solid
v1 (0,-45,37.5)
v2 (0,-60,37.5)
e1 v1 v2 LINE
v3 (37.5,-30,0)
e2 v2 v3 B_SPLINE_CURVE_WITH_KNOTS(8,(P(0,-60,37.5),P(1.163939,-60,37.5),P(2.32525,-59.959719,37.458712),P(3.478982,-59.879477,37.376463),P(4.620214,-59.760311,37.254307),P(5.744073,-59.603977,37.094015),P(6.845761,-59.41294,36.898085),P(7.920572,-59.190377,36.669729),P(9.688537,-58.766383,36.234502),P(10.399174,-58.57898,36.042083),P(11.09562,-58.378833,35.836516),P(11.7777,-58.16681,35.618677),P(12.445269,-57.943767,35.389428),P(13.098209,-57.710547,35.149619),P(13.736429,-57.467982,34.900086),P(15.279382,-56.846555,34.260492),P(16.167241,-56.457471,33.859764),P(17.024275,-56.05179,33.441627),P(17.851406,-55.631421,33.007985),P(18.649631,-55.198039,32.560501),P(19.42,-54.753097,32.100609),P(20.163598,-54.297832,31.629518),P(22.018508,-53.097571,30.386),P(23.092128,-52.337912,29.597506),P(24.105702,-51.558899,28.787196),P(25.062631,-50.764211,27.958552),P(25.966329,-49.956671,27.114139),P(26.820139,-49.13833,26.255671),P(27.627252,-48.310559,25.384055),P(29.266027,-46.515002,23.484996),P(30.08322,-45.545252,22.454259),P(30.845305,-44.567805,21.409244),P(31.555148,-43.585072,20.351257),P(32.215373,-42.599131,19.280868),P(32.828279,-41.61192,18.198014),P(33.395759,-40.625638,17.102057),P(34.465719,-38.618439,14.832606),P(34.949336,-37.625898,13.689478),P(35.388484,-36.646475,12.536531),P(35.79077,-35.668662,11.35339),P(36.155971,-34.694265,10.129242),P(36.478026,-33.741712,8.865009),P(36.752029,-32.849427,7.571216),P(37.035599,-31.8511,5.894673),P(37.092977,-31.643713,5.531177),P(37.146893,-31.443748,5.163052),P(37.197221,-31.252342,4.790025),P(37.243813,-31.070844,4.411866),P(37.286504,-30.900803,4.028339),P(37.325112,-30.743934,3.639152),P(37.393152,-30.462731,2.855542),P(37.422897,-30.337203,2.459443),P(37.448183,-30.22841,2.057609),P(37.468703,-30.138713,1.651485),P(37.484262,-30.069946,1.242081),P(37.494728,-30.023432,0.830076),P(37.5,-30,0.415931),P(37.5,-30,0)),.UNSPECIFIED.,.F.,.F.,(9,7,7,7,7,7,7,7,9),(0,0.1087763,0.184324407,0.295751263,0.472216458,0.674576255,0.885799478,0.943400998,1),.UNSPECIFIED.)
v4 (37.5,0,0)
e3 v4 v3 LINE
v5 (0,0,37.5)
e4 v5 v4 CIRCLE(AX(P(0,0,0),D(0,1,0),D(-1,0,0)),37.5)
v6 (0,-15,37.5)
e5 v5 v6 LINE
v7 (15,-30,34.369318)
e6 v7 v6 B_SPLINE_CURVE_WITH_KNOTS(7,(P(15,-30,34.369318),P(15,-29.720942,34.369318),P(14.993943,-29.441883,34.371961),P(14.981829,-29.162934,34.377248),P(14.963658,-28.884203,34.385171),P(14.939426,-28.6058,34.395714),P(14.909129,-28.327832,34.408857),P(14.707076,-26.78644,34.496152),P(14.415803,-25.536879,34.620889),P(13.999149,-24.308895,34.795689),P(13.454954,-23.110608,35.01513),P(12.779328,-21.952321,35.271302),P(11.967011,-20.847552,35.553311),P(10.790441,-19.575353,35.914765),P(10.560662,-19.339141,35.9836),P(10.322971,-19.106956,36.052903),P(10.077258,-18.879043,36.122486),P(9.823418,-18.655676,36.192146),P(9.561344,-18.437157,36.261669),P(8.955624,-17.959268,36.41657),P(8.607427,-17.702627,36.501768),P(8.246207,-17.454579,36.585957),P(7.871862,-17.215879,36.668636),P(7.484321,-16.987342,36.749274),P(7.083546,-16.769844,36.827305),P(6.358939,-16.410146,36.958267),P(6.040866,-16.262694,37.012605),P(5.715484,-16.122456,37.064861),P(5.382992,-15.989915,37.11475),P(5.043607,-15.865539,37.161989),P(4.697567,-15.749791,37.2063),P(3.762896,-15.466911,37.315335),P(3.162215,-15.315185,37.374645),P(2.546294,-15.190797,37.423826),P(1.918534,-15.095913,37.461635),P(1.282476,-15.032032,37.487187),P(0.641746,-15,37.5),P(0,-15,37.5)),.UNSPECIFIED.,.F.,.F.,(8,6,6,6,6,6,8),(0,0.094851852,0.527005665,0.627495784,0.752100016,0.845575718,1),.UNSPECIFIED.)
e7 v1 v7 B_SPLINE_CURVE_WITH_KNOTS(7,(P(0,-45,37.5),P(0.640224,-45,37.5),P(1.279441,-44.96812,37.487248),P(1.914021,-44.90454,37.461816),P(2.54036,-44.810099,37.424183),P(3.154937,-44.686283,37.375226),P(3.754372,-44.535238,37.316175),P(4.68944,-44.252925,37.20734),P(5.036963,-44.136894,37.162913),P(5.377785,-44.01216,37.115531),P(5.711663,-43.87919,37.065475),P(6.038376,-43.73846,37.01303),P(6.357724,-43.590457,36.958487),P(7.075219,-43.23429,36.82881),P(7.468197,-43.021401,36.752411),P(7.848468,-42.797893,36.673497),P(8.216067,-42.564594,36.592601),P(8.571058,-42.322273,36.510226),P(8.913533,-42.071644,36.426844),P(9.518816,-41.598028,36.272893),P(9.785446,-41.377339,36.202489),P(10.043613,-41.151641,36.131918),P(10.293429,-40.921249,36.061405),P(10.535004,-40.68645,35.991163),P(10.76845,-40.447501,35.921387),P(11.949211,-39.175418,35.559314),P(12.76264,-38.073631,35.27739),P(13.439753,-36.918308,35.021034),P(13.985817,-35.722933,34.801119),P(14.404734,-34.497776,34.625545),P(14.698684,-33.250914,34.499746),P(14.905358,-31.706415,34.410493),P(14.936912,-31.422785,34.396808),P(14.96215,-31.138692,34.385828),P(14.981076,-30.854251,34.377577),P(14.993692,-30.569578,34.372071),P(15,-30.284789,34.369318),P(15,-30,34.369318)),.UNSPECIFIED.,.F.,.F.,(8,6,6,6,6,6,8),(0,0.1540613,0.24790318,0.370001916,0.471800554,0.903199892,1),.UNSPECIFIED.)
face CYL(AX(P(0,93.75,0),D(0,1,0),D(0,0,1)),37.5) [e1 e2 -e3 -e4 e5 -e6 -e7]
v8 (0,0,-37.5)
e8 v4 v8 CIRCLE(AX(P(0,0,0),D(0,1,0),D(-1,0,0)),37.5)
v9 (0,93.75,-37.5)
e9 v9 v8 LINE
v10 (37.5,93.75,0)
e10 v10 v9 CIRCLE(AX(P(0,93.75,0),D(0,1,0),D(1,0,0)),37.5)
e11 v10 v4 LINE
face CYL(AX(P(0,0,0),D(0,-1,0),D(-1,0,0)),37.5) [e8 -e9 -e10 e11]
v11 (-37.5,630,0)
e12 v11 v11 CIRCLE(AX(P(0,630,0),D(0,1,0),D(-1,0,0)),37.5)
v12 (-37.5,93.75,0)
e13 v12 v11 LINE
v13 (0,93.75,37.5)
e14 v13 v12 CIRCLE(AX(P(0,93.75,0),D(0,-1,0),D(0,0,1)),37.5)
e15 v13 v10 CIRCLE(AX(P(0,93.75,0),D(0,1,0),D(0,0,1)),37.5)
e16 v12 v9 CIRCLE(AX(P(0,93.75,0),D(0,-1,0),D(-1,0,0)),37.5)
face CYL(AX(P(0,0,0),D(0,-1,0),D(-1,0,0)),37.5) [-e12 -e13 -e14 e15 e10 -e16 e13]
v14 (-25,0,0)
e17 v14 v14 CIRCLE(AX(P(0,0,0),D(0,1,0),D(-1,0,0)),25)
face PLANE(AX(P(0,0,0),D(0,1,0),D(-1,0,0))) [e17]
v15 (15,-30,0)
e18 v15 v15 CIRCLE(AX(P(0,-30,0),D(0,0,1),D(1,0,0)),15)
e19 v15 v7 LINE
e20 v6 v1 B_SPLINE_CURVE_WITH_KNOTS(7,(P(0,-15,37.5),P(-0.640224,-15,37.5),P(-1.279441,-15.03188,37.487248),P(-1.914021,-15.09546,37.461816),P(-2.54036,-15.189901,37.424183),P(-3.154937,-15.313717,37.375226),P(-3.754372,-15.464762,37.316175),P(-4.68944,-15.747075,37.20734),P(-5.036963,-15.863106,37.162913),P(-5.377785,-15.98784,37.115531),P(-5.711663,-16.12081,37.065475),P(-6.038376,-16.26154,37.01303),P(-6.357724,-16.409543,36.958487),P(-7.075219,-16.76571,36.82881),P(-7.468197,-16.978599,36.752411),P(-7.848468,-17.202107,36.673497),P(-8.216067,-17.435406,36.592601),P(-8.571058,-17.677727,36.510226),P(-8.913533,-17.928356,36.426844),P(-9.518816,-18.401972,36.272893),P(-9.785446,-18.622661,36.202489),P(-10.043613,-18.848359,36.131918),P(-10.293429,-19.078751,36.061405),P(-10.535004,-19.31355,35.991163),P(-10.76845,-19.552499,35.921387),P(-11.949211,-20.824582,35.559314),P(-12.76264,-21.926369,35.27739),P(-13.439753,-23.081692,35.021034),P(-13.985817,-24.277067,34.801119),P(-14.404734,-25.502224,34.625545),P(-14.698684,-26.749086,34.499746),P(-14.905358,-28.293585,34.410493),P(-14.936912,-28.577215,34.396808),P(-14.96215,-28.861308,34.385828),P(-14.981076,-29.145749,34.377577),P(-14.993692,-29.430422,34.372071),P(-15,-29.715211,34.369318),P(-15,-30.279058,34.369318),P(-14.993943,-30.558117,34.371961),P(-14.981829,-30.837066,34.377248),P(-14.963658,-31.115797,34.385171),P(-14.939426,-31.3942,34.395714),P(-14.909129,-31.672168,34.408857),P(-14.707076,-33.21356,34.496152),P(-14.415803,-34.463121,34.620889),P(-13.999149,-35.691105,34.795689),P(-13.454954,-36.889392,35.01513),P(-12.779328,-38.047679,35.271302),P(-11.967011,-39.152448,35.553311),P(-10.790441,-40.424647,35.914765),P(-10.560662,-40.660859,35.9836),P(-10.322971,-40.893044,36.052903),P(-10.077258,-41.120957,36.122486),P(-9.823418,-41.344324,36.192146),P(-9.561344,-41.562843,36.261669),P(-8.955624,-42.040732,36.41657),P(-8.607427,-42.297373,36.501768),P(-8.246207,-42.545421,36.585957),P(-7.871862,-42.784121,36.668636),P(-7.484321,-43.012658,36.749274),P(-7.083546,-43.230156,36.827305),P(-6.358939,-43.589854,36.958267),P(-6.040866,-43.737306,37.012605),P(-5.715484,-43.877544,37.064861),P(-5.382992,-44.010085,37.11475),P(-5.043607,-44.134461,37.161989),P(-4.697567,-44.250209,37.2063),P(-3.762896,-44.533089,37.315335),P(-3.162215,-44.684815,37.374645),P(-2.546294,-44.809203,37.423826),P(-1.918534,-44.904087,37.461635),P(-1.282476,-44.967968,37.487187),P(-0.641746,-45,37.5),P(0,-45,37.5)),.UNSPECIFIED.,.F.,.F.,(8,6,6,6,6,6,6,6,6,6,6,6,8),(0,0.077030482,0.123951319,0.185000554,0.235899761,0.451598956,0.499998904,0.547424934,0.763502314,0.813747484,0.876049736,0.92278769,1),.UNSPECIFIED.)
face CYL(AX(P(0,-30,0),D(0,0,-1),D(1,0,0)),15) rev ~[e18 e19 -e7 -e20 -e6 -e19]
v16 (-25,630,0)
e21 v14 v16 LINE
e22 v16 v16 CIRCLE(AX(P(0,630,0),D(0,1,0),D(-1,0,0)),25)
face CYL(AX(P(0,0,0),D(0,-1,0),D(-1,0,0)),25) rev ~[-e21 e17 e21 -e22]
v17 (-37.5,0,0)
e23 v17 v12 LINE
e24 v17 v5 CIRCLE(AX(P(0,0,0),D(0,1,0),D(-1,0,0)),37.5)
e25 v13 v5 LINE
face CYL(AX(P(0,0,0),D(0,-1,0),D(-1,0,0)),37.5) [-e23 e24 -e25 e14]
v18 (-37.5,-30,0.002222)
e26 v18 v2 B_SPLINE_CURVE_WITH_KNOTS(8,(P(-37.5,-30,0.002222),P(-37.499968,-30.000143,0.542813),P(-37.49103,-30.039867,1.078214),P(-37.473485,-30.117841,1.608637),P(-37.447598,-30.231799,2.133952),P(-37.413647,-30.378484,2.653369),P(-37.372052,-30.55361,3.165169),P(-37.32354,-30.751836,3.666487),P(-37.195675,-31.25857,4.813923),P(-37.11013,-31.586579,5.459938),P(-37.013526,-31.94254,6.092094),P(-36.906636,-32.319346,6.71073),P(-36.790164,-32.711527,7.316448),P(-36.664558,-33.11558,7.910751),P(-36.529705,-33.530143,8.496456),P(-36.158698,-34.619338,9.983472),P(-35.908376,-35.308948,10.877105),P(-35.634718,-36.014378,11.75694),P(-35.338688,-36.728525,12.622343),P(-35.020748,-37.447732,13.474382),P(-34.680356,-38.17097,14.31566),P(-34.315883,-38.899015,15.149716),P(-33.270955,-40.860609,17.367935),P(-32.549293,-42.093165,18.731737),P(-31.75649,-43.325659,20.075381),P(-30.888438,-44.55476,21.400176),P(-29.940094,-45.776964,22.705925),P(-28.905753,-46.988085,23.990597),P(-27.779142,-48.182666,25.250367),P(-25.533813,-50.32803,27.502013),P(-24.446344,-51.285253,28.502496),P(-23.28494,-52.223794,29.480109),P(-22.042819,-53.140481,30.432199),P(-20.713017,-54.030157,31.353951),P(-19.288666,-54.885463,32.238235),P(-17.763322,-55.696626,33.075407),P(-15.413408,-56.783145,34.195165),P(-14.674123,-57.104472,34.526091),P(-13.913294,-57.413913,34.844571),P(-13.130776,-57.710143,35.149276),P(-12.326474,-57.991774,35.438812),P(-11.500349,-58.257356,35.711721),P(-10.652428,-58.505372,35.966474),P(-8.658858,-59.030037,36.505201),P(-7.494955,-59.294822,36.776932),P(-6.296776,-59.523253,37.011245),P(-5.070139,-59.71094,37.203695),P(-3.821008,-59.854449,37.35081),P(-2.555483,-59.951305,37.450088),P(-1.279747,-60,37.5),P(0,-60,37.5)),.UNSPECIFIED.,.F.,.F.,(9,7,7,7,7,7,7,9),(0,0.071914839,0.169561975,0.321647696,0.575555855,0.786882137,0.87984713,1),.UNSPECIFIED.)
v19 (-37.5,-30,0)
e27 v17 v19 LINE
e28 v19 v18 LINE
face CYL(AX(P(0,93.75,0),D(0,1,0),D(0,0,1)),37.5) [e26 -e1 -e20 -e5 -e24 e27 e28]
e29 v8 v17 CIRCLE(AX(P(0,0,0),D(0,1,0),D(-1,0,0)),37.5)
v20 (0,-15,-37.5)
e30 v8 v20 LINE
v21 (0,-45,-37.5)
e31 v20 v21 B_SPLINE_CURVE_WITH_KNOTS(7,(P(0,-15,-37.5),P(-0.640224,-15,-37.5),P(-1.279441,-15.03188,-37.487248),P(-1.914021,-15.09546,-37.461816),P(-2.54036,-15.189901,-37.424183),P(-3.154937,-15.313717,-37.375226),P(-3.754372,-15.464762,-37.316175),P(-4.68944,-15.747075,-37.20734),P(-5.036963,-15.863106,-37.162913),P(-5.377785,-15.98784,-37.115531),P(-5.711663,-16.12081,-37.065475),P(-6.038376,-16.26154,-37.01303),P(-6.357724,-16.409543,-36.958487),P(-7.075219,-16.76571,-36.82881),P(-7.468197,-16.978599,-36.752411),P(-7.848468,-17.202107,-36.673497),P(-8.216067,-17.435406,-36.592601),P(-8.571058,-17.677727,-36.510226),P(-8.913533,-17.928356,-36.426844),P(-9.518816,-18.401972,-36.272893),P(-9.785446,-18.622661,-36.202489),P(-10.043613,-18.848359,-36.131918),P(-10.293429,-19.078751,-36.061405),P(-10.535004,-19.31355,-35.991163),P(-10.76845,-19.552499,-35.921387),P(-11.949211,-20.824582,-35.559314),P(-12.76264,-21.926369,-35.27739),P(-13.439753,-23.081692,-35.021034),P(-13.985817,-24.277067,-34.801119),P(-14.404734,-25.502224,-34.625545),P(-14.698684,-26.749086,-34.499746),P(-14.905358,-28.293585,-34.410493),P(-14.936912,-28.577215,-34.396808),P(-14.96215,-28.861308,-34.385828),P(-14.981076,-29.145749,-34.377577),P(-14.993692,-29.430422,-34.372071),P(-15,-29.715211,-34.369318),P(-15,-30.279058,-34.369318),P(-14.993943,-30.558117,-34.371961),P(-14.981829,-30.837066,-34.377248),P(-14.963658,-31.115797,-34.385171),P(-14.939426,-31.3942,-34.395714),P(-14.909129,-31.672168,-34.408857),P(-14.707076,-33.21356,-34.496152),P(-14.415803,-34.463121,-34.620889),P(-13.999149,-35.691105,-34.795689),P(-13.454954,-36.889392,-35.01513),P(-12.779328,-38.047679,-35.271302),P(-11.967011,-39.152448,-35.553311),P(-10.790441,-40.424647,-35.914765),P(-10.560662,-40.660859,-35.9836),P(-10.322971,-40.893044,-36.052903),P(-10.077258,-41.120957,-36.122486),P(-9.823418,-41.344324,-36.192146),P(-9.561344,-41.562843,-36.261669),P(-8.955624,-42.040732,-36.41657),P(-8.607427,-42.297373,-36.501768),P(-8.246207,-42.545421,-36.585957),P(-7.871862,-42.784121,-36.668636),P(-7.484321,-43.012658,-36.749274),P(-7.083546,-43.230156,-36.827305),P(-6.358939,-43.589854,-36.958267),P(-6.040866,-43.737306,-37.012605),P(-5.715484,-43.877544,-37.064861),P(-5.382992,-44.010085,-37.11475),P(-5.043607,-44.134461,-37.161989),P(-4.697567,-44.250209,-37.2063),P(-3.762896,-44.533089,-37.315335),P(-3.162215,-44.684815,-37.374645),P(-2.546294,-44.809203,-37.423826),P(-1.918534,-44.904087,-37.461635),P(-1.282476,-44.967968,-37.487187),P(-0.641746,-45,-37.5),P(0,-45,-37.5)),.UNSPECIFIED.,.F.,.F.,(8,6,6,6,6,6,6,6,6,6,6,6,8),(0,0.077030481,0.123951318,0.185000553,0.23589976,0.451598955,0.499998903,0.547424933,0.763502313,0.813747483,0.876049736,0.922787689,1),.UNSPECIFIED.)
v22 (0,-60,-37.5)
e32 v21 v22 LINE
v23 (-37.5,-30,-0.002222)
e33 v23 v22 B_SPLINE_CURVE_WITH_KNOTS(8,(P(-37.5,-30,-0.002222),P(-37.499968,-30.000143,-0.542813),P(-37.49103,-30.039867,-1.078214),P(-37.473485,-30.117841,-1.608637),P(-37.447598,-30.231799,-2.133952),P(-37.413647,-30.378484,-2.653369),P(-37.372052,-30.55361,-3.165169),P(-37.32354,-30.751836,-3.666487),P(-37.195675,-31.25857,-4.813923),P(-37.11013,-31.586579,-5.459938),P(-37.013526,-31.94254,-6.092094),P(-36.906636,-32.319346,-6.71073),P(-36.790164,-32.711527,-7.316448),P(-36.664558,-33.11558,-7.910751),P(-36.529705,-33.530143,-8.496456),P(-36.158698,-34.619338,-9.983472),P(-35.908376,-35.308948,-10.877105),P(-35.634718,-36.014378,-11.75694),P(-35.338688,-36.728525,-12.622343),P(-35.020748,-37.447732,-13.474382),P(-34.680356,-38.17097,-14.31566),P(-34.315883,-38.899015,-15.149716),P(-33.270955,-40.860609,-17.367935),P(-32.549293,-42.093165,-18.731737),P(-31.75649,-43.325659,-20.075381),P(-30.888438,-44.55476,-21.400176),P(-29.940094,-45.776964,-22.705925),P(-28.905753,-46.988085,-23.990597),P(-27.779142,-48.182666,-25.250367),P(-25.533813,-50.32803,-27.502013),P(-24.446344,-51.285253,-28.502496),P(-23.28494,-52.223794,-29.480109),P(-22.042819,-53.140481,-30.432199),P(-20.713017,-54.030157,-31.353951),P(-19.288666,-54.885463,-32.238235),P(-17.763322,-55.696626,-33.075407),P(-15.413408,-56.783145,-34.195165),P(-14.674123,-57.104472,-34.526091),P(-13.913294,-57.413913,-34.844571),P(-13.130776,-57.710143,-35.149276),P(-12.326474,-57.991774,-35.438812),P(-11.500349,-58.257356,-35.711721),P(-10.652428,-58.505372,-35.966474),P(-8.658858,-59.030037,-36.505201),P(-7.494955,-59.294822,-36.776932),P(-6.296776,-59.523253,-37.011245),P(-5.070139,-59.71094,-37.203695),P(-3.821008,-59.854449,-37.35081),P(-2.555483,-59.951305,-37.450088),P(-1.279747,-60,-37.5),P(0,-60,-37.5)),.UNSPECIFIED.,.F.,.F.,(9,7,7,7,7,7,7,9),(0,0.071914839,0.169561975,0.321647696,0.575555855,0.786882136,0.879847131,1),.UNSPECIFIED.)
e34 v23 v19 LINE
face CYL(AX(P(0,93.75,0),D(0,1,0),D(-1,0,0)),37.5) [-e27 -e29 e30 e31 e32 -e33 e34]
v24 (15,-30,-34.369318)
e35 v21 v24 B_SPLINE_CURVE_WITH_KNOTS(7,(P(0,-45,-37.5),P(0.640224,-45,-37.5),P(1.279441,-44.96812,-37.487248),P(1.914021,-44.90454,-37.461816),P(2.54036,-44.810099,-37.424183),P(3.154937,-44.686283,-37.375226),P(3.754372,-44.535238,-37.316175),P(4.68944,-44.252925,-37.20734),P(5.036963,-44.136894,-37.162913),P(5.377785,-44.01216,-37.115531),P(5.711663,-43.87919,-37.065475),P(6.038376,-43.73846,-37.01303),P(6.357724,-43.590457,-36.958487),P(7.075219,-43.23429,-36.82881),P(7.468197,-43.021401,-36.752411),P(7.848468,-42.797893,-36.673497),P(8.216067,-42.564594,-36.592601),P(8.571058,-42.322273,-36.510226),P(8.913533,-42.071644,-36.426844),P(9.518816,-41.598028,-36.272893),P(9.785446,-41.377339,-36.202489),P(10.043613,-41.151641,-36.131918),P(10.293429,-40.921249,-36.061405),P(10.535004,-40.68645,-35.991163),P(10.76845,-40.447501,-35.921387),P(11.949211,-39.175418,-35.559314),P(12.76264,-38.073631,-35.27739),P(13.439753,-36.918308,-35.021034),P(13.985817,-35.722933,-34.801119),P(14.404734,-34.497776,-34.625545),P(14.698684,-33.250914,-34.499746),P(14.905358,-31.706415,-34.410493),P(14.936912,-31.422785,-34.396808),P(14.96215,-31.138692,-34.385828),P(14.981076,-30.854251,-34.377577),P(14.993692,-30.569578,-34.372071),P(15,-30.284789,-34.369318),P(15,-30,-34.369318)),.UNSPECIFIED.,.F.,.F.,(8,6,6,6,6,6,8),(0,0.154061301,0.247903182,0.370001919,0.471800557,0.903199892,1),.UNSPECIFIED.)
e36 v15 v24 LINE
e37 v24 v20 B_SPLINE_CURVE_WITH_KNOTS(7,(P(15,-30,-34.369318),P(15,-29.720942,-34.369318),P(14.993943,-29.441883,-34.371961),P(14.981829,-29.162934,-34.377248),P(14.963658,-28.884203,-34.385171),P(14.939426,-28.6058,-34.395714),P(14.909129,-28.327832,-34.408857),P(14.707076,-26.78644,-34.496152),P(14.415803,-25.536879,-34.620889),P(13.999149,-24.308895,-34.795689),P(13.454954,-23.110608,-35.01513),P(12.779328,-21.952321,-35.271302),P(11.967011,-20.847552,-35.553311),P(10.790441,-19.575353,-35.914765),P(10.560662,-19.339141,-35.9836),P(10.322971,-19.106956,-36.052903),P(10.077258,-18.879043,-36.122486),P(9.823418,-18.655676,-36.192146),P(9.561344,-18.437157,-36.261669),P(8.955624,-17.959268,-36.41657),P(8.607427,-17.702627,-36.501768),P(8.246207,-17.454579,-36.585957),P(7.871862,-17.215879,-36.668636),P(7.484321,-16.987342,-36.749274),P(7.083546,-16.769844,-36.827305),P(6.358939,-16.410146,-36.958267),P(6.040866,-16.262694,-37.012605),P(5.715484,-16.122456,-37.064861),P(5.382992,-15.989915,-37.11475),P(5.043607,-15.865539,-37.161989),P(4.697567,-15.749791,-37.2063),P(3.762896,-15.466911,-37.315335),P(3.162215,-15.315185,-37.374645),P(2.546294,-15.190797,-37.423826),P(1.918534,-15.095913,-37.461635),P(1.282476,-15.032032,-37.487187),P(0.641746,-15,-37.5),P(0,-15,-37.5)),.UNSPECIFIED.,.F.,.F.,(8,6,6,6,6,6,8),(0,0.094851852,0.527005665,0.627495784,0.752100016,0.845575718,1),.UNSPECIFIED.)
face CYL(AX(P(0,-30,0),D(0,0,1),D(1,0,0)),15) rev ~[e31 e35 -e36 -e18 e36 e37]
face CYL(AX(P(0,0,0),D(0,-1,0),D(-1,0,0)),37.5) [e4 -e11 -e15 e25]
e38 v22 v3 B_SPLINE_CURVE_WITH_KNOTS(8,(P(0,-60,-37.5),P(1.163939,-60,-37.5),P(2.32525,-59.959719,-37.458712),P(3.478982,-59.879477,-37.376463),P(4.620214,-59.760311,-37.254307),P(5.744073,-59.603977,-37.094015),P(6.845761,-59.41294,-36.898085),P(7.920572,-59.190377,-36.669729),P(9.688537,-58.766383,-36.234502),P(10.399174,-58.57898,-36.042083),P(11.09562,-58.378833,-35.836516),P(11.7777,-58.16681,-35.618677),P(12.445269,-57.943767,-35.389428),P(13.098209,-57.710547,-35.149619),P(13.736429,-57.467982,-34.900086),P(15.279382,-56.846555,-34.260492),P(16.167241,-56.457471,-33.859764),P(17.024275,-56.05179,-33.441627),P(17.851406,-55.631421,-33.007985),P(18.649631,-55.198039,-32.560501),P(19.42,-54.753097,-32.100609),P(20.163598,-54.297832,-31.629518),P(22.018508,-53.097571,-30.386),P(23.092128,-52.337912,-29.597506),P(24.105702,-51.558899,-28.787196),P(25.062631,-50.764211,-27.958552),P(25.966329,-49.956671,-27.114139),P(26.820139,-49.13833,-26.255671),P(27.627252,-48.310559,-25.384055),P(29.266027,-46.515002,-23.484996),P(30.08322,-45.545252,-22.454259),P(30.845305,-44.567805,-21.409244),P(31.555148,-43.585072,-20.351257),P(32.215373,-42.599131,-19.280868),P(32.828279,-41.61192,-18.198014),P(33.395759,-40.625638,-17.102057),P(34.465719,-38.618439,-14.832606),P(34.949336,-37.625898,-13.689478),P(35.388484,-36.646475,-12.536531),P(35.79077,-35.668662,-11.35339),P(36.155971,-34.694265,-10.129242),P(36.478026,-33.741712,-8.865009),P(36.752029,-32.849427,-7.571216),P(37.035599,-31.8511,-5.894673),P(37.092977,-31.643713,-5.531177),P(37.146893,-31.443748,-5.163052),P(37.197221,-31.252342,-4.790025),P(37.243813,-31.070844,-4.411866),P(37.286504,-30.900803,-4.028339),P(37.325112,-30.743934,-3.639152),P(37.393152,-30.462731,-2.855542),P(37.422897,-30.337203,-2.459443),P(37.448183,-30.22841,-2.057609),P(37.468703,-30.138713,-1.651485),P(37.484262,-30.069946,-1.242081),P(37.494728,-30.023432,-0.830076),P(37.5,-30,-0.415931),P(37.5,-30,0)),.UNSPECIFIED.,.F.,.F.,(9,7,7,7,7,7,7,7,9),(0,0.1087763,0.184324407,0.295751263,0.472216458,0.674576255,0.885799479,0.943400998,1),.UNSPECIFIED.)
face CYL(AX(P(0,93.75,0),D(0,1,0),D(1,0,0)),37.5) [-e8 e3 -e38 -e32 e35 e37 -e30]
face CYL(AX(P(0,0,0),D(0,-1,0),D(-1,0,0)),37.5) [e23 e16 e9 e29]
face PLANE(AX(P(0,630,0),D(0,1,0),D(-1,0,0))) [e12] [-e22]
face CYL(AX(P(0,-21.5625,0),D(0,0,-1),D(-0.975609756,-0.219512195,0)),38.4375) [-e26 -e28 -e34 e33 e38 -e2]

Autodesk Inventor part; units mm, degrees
sketch "Sketch1" plane through (0, 0, 0) normal (0, 1, 0) x (-1, 0, 0)
  circle A0 centre (0, 0) radius 37.5
  circle A1 centre (0, 0) radius 25
  dimension "d0" = 75
  dimension "d1" = 50
extrude "Extrusion1" add sketch "Sketch1" along normal blind 630
sketch "Sketch2" plane through (0, 0, 0) normal (0, 1, 0) x (-1, 0, 0)
  line L0 (-37.5, -37.5) -> (37.5, -37.5)
  line L1 (37.5, -37.5) -> (37.5, 37.5)
  line L2 (37.5, 37.5) -> (-37.5, 37.5)
  line L3 (-37.5, 37.5) -> (-37.5, -37.5)
  point P0 (0, 0)
extrude "Extrusion2" add sketch "Sketch2" against normal blind 60
sketch "Sketch3" plane through (0, 0, 0) normal (0, 0, 1) x (1, 0, 0)
  circle A0 centre (0, -30) radius 15
  line L0 (-74.4823, 0) -> (79.3938, 0) projected
  line L1 (-37.5, 0) -> (-37.5, -60) projected
  line L2 (37.5, 0) -> (37.5, -60) projected
  arc A1 (-37.5, -30) -> (37.5, -30) centre (0, -21.5625) ccw
  line L3 (-37.5, -30) -> (-52.5, -30)
  line L4 (-52.5, -30) -> (-52.5, -80.2965)
  line L5 (-52.5, -80.2965) -> (57.4115, -80.2965)
  line L6 (57.4115, -80.2965) -> (57.4115, -30)
  line L7 (57.4115, -30) -> (37.5, -30)
  point P0 (0, 0)
  dimension "d6" = 30
  dimension "d7" = 30
extrude "Extrusion3" cut sketch "Sketch3" along normal mid plane 150 contours A0 | A1 L7 L6 L5 L4 L3
fillet "Fillet1" radius 37.5 4 edges at (37.5, -15, 37.5) (37.5, -15, -37.5) (-37.5, -15, 37.5) (-37.5, -15, -37.5)
properties part number "Cylinder_Bom"
